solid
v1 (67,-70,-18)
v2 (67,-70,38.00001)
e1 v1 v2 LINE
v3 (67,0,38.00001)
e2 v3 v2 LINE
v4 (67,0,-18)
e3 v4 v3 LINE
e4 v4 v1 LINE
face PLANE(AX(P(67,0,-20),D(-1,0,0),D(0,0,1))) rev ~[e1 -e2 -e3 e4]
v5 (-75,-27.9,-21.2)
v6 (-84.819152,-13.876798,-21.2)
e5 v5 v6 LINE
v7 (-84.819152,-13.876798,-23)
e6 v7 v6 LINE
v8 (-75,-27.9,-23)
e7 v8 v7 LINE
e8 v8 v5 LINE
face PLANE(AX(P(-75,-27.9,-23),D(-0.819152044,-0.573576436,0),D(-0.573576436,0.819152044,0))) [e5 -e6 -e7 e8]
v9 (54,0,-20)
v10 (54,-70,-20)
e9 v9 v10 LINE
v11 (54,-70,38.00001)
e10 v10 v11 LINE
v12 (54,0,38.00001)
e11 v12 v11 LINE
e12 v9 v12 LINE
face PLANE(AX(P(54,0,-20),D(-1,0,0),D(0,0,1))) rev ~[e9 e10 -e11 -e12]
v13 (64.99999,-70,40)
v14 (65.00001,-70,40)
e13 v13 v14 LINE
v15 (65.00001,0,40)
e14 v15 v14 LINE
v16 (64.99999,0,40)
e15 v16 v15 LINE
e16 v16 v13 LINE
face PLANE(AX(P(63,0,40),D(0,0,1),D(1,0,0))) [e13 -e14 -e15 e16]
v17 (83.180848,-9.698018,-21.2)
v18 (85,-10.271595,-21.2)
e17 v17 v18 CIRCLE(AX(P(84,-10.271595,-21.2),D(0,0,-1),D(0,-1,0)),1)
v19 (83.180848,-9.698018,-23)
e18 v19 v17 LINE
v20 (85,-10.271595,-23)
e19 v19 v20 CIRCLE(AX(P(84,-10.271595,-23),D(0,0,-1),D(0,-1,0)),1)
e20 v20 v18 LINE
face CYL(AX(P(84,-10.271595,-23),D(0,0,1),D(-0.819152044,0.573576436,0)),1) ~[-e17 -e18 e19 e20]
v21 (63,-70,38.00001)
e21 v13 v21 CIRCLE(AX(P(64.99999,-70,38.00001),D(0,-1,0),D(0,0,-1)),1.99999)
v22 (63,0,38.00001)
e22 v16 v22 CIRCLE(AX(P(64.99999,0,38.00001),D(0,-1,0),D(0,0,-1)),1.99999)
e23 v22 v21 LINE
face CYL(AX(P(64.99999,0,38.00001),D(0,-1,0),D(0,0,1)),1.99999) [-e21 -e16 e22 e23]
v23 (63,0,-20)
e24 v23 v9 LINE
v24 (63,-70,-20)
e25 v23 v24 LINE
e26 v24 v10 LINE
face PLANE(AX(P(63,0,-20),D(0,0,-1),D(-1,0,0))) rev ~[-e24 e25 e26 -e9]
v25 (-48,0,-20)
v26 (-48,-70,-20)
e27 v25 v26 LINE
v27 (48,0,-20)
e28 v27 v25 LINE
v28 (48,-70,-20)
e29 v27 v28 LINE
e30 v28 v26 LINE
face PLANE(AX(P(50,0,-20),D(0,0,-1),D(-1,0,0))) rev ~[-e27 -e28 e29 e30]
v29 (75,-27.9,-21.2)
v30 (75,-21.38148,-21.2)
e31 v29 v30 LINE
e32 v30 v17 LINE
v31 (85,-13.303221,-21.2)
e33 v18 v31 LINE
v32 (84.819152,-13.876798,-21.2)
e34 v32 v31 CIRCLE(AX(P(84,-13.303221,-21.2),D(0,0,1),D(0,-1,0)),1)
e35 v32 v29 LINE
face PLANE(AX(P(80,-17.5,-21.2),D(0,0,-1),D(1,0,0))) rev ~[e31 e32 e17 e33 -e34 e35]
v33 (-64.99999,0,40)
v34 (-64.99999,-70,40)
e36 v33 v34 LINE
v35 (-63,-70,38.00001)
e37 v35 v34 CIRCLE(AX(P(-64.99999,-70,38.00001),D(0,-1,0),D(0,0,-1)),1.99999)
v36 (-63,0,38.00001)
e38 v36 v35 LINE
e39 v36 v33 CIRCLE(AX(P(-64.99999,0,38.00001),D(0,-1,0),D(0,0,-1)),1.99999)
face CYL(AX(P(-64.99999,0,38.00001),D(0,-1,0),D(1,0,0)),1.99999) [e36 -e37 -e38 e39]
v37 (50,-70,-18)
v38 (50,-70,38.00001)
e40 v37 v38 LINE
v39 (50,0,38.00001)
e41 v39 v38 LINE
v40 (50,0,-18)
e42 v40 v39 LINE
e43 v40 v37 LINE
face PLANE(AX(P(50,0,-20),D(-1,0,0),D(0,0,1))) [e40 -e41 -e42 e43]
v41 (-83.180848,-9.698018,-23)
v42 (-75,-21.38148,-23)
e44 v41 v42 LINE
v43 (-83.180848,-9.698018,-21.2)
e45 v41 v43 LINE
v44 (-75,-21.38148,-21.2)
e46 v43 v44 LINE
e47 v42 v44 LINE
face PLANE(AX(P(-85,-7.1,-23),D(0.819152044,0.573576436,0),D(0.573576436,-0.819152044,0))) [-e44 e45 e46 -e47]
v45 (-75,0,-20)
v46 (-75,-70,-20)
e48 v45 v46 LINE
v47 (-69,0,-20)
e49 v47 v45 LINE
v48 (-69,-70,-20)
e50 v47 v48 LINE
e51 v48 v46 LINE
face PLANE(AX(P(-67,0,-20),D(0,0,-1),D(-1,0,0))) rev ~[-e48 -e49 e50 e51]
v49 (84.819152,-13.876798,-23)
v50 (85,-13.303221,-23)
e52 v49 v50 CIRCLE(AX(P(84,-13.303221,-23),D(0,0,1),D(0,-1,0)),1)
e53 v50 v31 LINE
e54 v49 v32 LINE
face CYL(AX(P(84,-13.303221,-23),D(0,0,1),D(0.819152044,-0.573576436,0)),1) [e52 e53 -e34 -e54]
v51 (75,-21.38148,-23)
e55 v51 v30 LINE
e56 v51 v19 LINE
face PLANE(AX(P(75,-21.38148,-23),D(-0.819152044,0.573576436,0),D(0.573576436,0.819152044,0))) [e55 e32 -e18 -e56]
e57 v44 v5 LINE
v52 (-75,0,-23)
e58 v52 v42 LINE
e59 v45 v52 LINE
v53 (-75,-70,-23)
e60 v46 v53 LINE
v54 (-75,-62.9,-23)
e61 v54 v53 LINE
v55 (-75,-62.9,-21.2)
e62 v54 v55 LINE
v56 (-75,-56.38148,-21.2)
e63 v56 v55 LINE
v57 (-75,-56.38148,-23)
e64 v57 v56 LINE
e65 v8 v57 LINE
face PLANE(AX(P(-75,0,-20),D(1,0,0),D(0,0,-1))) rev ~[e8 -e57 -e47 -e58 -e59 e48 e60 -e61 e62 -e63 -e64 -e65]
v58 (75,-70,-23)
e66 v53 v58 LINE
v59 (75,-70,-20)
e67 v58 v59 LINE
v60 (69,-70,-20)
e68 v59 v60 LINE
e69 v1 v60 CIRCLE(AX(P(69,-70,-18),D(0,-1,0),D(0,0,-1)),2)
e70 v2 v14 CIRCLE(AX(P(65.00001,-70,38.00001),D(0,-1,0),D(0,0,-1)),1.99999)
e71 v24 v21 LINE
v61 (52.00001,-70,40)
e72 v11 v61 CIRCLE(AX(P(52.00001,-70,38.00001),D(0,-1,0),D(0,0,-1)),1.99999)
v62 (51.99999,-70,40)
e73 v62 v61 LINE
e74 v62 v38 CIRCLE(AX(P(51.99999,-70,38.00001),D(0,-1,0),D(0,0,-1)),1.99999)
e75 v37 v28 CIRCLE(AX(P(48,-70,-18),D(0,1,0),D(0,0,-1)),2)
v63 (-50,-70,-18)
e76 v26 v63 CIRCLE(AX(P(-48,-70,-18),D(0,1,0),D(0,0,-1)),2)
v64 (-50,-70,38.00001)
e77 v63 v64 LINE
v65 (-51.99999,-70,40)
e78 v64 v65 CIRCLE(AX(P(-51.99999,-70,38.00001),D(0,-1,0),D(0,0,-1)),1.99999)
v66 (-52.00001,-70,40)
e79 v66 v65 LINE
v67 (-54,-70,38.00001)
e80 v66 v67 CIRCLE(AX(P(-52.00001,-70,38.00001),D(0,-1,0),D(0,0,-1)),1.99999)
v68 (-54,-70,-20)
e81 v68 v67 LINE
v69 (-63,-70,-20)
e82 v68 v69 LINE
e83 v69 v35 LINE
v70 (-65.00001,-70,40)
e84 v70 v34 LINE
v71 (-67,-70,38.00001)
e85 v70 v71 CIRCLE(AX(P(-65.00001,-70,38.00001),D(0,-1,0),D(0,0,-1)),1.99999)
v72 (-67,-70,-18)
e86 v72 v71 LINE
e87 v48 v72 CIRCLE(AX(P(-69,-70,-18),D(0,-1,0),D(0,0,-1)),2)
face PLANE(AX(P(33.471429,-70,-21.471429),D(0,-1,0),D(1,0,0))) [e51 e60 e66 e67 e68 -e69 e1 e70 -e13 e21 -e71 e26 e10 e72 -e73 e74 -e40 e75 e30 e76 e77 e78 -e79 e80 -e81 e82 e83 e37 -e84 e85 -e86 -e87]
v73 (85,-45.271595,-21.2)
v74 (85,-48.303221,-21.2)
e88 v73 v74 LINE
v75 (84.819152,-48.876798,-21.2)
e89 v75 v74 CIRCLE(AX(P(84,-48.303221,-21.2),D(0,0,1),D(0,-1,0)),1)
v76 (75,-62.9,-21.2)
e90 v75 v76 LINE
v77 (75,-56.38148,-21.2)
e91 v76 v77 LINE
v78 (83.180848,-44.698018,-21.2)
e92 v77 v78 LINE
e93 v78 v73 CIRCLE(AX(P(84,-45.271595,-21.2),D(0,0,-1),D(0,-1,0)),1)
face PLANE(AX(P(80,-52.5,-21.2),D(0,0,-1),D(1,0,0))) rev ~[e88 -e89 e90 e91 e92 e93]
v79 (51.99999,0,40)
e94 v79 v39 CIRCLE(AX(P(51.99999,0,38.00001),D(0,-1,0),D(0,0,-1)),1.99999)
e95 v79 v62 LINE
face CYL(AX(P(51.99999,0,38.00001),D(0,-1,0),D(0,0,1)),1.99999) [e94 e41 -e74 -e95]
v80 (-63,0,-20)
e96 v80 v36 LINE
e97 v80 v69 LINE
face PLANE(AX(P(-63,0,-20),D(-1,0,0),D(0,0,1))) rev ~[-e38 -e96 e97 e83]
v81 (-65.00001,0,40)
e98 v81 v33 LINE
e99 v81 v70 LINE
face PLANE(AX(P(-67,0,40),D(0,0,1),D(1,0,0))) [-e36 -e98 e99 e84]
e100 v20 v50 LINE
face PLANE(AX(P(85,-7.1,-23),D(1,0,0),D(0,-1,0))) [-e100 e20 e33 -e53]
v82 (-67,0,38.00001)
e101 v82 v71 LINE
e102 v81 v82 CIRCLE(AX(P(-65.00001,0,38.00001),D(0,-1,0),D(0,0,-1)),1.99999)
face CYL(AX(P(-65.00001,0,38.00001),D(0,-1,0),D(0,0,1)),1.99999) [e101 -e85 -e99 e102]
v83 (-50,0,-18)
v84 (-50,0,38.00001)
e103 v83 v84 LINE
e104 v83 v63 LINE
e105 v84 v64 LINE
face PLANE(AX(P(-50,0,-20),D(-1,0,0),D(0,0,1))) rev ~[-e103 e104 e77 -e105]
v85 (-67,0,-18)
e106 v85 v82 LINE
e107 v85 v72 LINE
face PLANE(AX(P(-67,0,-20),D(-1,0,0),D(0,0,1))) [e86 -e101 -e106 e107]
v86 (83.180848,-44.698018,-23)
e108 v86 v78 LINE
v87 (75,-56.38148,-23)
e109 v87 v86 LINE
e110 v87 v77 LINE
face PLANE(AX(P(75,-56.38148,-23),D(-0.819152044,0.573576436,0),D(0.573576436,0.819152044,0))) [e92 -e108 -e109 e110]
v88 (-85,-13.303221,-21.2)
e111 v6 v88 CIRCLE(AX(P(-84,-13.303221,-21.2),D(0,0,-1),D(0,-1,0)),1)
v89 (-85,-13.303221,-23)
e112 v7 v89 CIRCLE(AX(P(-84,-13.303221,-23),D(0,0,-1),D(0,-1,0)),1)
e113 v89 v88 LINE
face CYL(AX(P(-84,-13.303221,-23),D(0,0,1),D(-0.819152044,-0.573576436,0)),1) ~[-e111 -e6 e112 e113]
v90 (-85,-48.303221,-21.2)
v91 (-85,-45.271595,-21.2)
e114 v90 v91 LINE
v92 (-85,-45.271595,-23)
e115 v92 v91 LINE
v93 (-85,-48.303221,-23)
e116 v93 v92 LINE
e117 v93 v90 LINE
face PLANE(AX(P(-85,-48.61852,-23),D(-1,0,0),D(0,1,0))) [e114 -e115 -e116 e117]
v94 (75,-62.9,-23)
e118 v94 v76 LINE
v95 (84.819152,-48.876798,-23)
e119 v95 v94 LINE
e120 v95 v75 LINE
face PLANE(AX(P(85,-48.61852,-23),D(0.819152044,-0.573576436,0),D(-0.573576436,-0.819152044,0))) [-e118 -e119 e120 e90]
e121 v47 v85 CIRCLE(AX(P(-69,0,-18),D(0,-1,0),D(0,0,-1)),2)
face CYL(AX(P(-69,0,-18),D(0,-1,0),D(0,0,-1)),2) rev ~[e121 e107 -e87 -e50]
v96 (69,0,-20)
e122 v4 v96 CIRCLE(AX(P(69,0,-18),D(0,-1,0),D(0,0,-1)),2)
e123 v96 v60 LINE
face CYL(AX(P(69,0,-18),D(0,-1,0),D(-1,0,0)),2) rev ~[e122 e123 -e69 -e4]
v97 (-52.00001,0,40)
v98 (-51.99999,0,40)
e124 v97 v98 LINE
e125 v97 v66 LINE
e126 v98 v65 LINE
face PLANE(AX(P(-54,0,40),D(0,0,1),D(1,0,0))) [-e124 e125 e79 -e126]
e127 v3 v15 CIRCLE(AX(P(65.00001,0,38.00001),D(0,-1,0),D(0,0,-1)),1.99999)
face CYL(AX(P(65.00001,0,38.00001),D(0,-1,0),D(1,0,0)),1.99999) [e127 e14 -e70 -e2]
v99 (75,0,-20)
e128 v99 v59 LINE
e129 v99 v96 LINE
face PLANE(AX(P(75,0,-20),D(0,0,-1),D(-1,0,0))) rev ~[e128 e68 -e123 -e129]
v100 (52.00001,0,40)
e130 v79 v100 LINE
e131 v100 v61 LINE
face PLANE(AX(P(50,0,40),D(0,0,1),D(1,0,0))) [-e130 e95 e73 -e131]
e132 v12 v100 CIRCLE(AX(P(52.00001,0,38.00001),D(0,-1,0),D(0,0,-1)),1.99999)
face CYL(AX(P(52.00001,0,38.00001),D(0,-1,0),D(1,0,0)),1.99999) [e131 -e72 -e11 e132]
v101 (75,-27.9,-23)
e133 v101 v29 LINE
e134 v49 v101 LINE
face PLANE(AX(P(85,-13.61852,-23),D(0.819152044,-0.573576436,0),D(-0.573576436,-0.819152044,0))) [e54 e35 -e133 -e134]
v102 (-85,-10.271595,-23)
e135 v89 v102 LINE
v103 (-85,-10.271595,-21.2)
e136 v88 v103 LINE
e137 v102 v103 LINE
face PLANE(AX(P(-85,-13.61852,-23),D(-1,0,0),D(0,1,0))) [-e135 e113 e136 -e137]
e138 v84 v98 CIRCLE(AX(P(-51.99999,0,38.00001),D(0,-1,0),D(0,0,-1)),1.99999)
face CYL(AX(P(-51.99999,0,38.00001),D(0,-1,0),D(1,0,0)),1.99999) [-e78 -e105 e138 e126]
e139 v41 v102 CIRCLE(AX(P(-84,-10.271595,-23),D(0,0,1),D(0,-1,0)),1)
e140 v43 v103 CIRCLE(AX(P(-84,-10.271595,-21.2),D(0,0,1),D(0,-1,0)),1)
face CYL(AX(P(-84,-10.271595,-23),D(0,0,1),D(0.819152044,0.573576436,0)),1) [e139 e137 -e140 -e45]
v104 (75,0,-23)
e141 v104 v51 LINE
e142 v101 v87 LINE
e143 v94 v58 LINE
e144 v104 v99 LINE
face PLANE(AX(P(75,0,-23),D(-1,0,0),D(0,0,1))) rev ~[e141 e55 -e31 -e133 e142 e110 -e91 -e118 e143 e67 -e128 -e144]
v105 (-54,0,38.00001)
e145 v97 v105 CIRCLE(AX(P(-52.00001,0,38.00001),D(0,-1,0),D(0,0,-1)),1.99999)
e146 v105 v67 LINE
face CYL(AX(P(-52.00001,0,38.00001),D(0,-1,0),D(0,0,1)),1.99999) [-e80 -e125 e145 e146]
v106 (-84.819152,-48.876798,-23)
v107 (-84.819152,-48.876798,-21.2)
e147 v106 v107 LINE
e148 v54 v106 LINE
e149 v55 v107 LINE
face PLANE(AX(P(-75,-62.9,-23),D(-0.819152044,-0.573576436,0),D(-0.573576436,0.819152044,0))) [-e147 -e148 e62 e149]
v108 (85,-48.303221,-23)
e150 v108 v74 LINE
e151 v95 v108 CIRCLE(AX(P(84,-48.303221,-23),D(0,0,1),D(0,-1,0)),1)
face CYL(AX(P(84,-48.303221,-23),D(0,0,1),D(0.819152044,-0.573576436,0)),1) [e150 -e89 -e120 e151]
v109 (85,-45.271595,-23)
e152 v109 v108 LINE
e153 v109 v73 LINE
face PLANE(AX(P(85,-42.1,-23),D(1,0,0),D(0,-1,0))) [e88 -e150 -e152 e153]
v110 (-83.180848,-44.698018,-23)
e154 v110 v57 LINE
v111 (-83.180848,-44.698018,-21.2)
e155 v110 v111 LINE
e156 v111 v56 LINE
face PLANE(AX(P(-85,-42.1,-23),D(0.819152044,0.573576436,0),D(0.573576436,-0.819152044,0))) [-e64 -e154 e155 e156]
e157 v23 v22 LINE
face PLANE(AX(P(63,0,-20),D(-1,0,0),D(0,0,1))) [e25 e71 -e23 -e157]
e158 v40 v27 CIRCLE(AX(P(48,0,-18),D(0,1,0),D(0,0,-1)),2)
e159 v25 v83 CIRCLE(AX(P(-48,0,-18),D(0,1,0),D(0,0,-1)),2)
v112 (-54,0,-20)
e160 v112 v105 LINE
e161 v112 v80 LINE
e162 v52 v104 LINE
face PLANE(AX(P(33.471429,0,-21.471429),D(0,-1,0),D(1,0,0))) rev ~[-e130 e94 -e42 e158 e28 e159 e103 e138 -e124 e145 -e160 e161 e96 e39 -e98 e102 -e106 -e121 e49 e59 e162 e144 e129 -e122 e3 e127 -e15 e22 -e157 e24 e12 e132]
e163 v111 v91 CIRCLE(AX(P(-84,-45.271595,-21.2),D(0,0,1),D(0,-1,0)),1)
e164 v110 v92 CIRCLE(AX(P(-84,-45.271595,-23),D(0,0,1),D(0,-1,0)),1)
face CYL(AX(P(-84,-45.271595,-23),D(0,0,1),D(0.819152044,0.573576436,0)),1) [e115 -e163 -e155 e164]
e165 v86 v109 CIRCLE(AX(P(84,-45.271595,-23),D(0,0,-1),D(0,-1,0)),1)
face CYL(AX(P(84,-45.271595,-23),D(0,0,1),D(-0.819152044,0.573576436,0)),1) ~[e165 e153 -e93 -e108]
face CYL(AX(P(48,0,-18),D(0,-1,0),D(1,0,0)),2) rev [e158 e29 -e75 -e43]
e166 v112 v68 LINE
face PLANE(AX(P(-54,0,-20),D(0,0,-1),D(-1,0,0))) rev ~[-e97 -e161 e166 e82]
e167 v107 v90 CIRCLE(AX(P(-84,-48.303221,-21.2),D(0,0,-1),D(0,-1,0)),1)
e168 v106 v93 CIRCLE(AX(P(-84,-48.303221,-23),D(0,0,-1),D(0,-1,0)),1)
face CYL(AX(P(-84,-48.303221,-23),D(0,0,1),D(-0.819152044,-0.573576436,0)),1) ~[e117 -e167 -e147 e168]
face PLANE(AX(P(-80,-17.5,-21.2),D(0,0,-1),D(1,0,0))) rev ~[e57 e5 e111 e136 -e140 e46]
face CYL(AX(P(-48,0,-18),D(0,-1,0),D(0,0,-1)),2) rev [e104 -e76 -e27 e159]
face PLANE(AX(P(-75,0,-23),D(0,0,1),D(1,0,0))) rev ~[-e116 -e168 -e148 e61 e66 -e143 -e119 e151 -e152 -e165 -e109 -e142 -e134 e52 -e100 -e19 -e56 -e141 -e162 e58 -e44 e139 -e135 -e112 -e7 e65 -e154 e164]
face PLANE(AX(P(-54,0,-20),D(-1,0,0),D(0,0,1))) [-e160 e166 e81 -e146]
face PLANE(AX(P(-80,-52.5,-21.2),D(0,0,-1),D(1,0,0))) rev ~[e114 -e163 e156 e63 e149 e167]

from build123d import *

# Parameters (mm, degrees)
F0_W     = 4
F0_H     = 60
F1_DEPTH = 70
F2_R     = 1.99999
F3_R     = 2
F5_DEPTH = 1.8
F6_R     = 1


# Not quite as in the source:
# - a fillet or chamfer is up to 0.001 mm smaller than in the source, because OpenCascade refuses the exact size


with BuildPart() as f1:
    # F0 (on Front) → F1 (new body)
    with BuildSketch(Plane.XZ):
        Polygon((0, -20), (0, -23), (65, -23), (65, -21), (67, -21), (67, -20), (63, -20), (54, -20), (50, -20), align=None)
        Polygon((-65, -23), (0, -23), (0, -20), (-50, -20), (-54, -20), (-63, -20), (-67, -20), (-67, -21), (-65, -21), align=None)
        Polygon((65, -21), (65, -23), (71, -23), (71, -22.25), (71, -21), (67, -21), align=None)
        Polygon((-71, -23), (-65, -23), (-65, -21), (-67, -21), (-71, -21), (-71, -22.25), align=None)
        Polygon((71, -22.25), (71, -23), (75, -23), (75, -21), (71, -21), align=None)
        with Locations((52, 10)):
            Rectangle(F0_W, F0_H)
        with Locations((-52, 10)):
            Rectangle(F0_W, F0_H)
        Polygon((-75, -23), (-71, -23), (-71, -22.25), (-71, -21), (-75, -21), align=None)
        Polygon((67, -20), (67, -21), (71, -21), (75, -21), (75, -20), align=None)
        Polygon((-71, -21), (-67, -21), (-67, -20), (-75, -20), (-75, -21), align=None)
        with Locations((65, 10)):
            Rectangle(F0_W, F0_H)
        with Locations((-65, 10)):
            Rectangle(F0_W, F0_H)
    extrude(amount=F1_DEPTH)

    # F2 (radius 2 in the source; OpenCascade refuses exactly that, so slightly less here)
    f2_edges = [f1.edges().sort_by_distance(p)[0] for p in [
        (-67, -35, 40),
        (-63, -35, 40),
        (-54, -35, 40),
        (-50, -35, 40),
        (54, -35, 40),
        (50, -35, 40),
        (63, -35, 40),
        (67, -35, 40),
    ]]
    fillet(f2_edges, radius=F2_R)

    # F3
    f3_edges = [f1.edges().sort_by_distance(p)[0] for p in [
        (-50, -35, -20),
        (50, -35, -20),
        (-67, -35, -20),
        (67, -35, -20),
    ]]
    fillet(f3_edges, radius=F3_R)

    # F4 (on face) → F5 (join)
    with BuildSketch(Plane(origin=(0, 0, -23), x_dir=(1, 0, 0), z_dir=(0, 0, -1))):
        Polygon((-85, 42.1), (-75, 56.3814800674), (-75, 62.9), (-85, 48.6185199326), align=None)
        Polygon((-75, 21.3814800674), (-75, 27.9), (-85, 13.6185199326), (-85, 7.1), align=None)
        Polygon((85, 13.6185199326), (75, 27.9), (75, 21.3814800674), (85, 7.1), align=None)
        Polygon((75, 62.9), (75, 56.3814800674), (85, 42.1), (85, 48.6185199326), align=None)
    extrude(amount=-F5_DEPTH)

    # F6
    f6_edges = [f1.edges().sort_by_distance(p)[0] for p in [
        (85, -42.1, -22.1),
        (85, -7.1, -22.1),
        (85, -13.61852, -22.1),
        (85, -48.61852, -22.1),
        (-85, -7.1, -22.1),
        (-85, -13.61852, -22.1),
        (-85, -42.1, -22.1),
        (-85, -48.61852, -22.1),
    ]]
    fillet(f6_edges, radius=F6_R)


solid = f1.part
